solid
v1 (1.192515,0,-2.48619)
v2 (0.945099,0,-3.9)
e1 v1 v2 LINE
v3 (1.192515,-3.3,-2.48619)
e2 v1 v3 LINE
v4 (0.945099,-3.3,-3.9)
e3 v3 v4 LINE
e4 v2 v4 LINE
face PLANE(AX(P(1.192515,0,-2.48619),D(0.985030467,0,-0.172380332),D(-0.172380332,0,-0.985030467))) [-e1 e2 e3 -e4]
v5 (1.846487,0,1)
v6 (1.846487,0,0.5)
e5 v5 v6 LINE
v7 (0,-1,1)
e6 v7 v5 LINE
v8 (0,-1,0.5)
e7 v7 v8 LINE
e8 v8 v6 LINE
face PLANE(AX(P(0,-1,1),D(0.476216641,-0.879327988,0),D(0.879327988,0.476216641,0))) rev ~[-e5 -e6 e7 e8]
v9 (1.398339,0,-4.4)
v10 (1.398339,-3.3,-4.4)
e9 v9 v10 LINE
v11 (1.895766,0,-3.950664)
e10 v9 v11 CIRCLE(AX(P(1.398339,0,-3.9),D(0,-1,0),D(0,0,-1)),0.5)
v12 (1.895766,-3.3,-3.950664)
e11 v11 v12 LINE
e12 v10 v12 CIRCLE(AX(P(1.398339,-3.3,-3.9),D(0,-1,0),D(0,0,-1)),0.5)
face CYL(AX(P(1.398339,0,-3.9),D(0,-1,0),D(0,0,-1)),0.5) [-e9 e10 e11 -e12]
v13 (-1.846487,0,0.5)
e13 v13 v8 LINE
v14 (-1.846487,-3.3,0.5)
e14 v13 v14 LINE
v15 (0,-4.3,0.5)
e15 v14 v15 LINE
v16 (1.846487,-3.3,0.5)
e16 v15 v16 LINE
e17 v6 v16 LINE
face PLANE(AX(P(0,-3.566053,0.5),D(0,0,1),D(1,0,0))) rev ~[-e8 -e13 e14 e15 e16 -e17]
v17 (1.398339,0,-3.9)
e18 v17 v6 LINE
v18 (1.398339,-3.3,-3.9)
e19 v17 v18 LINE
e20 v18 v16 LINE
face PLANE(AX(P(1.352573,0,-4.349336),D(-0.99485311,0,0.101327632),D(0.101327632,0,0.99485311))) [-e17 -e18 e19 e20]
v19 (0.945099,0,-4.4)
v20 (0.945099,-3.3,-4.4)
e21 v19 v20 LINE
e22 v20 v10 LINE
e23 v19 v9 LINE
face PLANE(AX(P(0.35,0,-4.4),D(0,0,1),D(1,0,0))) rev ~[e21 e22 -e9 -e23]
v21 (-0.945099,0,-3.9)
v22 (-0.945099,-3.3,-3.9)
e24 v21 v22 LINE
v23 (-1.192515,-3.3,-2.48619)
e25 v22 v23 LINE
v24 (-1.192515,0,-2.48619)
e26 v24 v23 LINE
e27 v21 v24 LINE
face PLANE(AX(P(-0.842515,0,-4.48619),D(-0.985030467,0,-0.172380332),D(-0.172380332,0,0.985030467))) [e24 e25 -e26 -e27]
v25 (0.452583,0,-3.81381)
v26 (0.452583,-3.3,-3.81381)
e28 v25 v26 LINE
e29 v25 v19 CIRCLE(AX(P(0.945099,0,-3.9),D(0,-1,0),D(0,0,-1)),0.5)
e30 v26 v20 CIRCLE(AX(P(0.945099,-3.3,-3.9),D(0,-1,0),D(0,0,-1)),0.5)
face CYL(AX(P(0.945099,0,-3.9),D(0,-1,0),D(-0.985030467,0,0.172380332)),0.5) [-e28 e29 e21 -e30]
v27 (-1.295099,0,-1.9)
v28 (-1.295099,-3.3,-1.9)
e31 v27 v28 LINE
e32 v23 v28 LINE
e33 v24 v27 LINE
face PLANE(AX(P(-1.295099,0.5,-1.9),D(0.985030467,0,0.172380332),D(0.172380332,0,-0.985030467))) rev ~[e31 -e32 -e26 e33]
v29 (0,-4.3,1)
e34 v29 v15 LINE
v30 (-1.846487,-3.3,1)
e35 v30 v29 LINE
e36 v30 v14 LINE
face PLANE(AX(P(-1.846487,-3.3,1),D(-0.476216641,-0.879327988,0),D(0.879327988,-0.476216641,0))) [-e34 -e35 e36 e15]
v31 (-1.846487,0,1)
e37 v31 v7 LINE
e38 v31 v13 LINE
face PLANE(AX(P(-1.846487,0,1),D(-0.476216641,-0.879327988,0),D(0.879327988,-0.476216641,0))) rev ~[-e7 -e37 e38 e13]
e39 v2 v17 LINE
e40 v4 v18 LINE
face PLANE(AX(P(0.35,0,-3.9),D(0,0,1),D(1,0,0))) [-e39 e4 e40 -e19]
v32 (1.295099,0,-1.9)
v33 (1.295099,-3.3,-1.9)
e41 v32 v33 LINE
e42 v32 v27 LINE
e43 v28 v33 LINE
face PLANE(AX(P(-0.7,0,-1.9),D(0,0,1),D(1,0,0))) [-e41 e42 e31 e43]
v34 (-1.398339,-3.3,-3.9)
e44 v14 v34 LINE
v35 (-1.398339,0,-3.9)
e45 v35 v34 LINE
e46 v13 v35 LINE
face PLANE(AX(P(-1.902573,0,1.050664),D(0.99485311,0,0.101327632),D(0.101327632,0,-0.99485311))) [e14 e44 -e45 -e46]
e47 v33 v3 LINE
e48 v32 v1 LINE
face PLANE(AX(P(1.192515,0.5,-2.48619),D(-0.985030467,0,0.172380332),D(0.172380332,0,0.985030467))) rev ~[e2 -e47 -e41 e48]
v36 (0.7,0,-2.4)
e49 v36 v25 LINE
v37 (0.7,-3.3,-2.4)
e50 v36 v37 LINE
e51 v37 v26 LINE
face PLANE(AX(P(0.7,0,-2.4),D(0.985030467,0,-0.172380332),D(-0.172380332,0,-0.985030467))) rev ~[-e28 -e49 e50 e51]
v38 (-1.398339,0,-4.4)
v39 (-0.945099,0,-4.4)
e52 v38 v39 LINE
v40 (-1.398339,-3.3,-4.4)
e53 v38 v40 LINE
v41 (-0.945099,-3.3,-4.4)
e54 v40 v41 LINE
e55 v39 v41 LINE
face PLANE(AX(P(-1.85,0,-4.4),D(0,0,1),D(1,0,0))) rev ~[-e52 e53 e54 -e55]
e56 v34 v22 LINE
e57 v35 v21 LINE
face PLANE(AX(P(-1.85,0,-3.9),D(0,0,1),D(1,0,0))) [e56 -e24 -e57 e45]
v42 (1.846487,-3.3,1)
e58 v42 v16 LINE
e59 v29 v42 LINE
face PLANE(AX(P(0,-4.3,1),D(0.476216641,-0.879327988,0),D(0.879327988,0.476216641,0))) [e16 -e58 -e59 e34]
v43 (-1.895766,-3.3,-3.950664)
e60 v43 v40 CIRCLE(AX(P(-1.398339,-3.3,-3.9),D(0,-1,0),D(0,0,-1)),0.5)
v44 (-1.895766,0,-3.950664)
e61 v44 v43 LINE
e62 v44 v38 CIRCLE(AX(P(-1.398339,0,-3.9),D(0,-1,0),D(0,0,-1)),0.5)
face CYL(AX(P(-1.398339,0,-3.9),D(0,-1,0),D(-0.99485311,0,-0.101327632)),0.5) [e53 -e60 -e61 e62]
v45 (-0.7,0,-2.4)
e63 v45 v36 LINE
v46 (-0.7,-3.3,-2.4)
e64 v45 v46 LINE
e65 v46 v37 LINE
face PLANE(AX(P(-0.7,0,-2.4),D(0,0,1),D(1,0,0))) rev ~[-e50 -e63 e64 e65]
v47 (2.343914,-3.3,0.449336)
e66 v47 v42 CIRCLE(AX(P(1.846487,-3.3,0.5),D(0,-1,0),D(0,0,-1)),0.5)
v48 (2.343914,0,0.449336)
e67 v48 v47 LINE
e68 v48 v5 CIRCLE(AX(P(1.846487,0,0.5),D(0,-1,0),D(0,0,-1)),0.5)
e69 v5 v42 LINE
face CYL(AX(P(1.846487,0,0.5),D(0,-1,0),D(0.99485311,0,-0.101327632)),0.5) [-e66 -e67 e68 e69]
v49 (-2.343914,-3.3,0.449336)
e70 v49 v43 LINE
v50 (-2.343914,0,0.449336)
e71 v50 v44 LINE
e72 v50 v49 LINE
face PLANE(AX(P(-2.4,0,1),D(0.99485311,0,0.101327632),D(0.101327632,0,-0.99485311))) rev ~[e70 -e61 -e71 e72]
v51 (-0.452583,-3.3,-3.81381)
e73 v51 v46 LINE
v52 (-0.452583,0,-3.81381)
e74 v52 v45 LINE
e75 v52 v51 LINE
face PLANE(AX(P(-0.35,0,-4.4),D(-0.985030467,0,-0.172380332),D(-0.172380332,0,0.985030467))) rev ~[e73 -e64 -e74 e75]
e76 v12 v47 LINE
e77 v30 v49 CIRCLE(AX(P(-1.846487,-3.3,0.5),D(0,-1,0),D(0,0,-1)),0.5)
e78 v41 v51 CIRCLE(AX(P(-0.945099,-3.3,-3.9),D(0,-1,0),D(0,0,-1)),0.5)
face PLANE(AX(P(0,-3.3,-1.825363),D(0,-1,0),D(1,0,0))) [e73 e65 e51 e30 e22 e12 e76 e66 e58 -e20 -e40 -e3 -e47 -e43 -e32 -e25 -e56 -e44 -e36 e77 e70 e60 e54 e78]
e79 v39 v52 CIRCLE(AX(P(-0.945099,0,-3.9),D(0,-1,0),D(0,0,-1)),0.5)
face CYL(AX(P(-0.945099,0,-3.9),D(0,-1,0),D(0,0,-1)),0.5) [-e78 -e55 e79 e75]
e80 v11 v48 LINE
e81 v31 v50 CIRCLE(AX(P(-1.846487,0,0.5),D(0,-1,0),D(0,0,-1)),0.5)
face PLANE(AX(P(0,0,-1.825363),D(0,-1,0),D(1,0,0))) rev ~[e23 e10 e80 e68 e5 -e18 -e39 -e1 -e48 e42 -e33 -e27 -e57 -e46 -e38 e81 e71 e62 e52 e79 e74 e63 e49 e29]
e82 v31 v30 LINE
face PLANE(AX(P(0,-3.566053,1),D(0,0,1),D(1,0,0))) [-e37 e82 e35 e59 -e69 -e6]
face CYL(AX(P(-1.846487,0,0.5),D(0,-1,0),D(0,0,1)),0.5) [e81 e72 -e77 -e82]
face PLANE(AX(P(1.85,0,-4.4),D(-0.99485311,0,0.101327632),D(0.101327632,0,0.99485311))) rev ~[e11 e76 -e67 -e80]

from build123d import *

# Parameters (mm, degrees)
F1_DEPTH    = 3.3
F2_R        = 0.5
F3_T        = 0.5
F3_T3_DEPTH = 4.3
F5_DEPTH    = 0.5
F6_DEPTH    = 0.5


# Not quite as in the source:
# - a shell that OpenCascade refuses in one call is made with other operations: the cavity is built on its own and cut out


with BuildPart() as f1:
    # F0 (on Front) → F1 (new body)
    with BuildSketch(Plane.XZ):
        Polygon((-0.7, -2.4), (0, -2.4), (0.7, -2.4), (0.35, -4.4), (1.85, -4.4), (2.4, 1), (0, 1), (-2.4, 1), (-1.85, -4.4), (-0.35, -4.4), align=None)
    extrude(amount=F1_DEPTH)

    # F2
    f2_edges = [f1.edges().sort_by_distance(p)[0] for p in [
        (2.4, -1.65, 1),
        (1.85, -1.65, -4.4),
        (-0.35, -1.65, -4.4),
        (-2.4, -1.65, 1),
        (0.35, -1.65, -4.4),
        (-1.85, -1.65, -4.4),
    ]]
    fillet(f2_edges, radius=F2_R)

    # F3: shell of thickness 0.5, made by hand


with BuildPart() as f3_core1:
    # F3_t2: copy of F1
    add(f1.part)

    # the walls: a layer under each face that stays
    f3_faces = [f3_core1.faces().sort_by_distance(p)[0] for p in [
        (0.5762916395, -1.65, -3.1069049171),
        (0, -1.65, -2.4),
        (1.17171884, -1.65, -4.4),
        (-0.5762916395, -1.65, -3.1069049171),
        (2.1198397965, -1.65, -1.7506638158),
        (-1.17171884, -1.65, -4.4),
        (0, -1.65, 1),
        (-2.1198397965, -1.65, -1.7506638158),
    ]]
    thicken(f3_faces, amount=-F3_T, mode=Mode.SUBTRACT)

    # F3_s4 → F3_t3 (cut)
    with BuildSketch(Plane.XZ.offset(-0.5)):
        Polygon((0.6950748477, -2.4041380983), (1.1925152336, -2.4861901659), (1.2950985126, -1.9), (0.7, -1.9), align=None)
        Polygon((-0.6950748477, -2.4041380983), (-0.7, -1.9), (-1.2950985126, -1.9), (-1.1925152336, -2.4861901659), align=None)
    extrude(amount=F3_T3_DEPTH, mode=Mode.SUBTRACT)


with BuildPart() as f1_1:
    add(f1.part)

    # what is left inside the walls is the cavity
    f3_cavity = [f3_core1.part.solids().sort_by_distance(p)[0] for p in [
        (-1.617439, -2.2, -1.699493),
    ]]
    add(f3_cavity, mode=Mode.SUBTRACT)

    # F4 (on face) → F5 (join, through all)
    with BuildSketch(Plane.XY.offset(1)):
        Polygon((1.8464873155, -3.3), (-1.8464873155, -3.3), (0, -4.3), align=None)
    extrude(amount=-F5_DEPTH)

    # F4 (on face) → F6 (cut, through all)
    with BuildSketch(Plane.XY.offset(1)):
        Polygon((1.8464873155, 0), (-1.8464873155, 0), (0, -1), align=None)
    extrude(amount=-F6_DEPTH, mode=Mode.SUBTRACT)


solid = f1_1.part
